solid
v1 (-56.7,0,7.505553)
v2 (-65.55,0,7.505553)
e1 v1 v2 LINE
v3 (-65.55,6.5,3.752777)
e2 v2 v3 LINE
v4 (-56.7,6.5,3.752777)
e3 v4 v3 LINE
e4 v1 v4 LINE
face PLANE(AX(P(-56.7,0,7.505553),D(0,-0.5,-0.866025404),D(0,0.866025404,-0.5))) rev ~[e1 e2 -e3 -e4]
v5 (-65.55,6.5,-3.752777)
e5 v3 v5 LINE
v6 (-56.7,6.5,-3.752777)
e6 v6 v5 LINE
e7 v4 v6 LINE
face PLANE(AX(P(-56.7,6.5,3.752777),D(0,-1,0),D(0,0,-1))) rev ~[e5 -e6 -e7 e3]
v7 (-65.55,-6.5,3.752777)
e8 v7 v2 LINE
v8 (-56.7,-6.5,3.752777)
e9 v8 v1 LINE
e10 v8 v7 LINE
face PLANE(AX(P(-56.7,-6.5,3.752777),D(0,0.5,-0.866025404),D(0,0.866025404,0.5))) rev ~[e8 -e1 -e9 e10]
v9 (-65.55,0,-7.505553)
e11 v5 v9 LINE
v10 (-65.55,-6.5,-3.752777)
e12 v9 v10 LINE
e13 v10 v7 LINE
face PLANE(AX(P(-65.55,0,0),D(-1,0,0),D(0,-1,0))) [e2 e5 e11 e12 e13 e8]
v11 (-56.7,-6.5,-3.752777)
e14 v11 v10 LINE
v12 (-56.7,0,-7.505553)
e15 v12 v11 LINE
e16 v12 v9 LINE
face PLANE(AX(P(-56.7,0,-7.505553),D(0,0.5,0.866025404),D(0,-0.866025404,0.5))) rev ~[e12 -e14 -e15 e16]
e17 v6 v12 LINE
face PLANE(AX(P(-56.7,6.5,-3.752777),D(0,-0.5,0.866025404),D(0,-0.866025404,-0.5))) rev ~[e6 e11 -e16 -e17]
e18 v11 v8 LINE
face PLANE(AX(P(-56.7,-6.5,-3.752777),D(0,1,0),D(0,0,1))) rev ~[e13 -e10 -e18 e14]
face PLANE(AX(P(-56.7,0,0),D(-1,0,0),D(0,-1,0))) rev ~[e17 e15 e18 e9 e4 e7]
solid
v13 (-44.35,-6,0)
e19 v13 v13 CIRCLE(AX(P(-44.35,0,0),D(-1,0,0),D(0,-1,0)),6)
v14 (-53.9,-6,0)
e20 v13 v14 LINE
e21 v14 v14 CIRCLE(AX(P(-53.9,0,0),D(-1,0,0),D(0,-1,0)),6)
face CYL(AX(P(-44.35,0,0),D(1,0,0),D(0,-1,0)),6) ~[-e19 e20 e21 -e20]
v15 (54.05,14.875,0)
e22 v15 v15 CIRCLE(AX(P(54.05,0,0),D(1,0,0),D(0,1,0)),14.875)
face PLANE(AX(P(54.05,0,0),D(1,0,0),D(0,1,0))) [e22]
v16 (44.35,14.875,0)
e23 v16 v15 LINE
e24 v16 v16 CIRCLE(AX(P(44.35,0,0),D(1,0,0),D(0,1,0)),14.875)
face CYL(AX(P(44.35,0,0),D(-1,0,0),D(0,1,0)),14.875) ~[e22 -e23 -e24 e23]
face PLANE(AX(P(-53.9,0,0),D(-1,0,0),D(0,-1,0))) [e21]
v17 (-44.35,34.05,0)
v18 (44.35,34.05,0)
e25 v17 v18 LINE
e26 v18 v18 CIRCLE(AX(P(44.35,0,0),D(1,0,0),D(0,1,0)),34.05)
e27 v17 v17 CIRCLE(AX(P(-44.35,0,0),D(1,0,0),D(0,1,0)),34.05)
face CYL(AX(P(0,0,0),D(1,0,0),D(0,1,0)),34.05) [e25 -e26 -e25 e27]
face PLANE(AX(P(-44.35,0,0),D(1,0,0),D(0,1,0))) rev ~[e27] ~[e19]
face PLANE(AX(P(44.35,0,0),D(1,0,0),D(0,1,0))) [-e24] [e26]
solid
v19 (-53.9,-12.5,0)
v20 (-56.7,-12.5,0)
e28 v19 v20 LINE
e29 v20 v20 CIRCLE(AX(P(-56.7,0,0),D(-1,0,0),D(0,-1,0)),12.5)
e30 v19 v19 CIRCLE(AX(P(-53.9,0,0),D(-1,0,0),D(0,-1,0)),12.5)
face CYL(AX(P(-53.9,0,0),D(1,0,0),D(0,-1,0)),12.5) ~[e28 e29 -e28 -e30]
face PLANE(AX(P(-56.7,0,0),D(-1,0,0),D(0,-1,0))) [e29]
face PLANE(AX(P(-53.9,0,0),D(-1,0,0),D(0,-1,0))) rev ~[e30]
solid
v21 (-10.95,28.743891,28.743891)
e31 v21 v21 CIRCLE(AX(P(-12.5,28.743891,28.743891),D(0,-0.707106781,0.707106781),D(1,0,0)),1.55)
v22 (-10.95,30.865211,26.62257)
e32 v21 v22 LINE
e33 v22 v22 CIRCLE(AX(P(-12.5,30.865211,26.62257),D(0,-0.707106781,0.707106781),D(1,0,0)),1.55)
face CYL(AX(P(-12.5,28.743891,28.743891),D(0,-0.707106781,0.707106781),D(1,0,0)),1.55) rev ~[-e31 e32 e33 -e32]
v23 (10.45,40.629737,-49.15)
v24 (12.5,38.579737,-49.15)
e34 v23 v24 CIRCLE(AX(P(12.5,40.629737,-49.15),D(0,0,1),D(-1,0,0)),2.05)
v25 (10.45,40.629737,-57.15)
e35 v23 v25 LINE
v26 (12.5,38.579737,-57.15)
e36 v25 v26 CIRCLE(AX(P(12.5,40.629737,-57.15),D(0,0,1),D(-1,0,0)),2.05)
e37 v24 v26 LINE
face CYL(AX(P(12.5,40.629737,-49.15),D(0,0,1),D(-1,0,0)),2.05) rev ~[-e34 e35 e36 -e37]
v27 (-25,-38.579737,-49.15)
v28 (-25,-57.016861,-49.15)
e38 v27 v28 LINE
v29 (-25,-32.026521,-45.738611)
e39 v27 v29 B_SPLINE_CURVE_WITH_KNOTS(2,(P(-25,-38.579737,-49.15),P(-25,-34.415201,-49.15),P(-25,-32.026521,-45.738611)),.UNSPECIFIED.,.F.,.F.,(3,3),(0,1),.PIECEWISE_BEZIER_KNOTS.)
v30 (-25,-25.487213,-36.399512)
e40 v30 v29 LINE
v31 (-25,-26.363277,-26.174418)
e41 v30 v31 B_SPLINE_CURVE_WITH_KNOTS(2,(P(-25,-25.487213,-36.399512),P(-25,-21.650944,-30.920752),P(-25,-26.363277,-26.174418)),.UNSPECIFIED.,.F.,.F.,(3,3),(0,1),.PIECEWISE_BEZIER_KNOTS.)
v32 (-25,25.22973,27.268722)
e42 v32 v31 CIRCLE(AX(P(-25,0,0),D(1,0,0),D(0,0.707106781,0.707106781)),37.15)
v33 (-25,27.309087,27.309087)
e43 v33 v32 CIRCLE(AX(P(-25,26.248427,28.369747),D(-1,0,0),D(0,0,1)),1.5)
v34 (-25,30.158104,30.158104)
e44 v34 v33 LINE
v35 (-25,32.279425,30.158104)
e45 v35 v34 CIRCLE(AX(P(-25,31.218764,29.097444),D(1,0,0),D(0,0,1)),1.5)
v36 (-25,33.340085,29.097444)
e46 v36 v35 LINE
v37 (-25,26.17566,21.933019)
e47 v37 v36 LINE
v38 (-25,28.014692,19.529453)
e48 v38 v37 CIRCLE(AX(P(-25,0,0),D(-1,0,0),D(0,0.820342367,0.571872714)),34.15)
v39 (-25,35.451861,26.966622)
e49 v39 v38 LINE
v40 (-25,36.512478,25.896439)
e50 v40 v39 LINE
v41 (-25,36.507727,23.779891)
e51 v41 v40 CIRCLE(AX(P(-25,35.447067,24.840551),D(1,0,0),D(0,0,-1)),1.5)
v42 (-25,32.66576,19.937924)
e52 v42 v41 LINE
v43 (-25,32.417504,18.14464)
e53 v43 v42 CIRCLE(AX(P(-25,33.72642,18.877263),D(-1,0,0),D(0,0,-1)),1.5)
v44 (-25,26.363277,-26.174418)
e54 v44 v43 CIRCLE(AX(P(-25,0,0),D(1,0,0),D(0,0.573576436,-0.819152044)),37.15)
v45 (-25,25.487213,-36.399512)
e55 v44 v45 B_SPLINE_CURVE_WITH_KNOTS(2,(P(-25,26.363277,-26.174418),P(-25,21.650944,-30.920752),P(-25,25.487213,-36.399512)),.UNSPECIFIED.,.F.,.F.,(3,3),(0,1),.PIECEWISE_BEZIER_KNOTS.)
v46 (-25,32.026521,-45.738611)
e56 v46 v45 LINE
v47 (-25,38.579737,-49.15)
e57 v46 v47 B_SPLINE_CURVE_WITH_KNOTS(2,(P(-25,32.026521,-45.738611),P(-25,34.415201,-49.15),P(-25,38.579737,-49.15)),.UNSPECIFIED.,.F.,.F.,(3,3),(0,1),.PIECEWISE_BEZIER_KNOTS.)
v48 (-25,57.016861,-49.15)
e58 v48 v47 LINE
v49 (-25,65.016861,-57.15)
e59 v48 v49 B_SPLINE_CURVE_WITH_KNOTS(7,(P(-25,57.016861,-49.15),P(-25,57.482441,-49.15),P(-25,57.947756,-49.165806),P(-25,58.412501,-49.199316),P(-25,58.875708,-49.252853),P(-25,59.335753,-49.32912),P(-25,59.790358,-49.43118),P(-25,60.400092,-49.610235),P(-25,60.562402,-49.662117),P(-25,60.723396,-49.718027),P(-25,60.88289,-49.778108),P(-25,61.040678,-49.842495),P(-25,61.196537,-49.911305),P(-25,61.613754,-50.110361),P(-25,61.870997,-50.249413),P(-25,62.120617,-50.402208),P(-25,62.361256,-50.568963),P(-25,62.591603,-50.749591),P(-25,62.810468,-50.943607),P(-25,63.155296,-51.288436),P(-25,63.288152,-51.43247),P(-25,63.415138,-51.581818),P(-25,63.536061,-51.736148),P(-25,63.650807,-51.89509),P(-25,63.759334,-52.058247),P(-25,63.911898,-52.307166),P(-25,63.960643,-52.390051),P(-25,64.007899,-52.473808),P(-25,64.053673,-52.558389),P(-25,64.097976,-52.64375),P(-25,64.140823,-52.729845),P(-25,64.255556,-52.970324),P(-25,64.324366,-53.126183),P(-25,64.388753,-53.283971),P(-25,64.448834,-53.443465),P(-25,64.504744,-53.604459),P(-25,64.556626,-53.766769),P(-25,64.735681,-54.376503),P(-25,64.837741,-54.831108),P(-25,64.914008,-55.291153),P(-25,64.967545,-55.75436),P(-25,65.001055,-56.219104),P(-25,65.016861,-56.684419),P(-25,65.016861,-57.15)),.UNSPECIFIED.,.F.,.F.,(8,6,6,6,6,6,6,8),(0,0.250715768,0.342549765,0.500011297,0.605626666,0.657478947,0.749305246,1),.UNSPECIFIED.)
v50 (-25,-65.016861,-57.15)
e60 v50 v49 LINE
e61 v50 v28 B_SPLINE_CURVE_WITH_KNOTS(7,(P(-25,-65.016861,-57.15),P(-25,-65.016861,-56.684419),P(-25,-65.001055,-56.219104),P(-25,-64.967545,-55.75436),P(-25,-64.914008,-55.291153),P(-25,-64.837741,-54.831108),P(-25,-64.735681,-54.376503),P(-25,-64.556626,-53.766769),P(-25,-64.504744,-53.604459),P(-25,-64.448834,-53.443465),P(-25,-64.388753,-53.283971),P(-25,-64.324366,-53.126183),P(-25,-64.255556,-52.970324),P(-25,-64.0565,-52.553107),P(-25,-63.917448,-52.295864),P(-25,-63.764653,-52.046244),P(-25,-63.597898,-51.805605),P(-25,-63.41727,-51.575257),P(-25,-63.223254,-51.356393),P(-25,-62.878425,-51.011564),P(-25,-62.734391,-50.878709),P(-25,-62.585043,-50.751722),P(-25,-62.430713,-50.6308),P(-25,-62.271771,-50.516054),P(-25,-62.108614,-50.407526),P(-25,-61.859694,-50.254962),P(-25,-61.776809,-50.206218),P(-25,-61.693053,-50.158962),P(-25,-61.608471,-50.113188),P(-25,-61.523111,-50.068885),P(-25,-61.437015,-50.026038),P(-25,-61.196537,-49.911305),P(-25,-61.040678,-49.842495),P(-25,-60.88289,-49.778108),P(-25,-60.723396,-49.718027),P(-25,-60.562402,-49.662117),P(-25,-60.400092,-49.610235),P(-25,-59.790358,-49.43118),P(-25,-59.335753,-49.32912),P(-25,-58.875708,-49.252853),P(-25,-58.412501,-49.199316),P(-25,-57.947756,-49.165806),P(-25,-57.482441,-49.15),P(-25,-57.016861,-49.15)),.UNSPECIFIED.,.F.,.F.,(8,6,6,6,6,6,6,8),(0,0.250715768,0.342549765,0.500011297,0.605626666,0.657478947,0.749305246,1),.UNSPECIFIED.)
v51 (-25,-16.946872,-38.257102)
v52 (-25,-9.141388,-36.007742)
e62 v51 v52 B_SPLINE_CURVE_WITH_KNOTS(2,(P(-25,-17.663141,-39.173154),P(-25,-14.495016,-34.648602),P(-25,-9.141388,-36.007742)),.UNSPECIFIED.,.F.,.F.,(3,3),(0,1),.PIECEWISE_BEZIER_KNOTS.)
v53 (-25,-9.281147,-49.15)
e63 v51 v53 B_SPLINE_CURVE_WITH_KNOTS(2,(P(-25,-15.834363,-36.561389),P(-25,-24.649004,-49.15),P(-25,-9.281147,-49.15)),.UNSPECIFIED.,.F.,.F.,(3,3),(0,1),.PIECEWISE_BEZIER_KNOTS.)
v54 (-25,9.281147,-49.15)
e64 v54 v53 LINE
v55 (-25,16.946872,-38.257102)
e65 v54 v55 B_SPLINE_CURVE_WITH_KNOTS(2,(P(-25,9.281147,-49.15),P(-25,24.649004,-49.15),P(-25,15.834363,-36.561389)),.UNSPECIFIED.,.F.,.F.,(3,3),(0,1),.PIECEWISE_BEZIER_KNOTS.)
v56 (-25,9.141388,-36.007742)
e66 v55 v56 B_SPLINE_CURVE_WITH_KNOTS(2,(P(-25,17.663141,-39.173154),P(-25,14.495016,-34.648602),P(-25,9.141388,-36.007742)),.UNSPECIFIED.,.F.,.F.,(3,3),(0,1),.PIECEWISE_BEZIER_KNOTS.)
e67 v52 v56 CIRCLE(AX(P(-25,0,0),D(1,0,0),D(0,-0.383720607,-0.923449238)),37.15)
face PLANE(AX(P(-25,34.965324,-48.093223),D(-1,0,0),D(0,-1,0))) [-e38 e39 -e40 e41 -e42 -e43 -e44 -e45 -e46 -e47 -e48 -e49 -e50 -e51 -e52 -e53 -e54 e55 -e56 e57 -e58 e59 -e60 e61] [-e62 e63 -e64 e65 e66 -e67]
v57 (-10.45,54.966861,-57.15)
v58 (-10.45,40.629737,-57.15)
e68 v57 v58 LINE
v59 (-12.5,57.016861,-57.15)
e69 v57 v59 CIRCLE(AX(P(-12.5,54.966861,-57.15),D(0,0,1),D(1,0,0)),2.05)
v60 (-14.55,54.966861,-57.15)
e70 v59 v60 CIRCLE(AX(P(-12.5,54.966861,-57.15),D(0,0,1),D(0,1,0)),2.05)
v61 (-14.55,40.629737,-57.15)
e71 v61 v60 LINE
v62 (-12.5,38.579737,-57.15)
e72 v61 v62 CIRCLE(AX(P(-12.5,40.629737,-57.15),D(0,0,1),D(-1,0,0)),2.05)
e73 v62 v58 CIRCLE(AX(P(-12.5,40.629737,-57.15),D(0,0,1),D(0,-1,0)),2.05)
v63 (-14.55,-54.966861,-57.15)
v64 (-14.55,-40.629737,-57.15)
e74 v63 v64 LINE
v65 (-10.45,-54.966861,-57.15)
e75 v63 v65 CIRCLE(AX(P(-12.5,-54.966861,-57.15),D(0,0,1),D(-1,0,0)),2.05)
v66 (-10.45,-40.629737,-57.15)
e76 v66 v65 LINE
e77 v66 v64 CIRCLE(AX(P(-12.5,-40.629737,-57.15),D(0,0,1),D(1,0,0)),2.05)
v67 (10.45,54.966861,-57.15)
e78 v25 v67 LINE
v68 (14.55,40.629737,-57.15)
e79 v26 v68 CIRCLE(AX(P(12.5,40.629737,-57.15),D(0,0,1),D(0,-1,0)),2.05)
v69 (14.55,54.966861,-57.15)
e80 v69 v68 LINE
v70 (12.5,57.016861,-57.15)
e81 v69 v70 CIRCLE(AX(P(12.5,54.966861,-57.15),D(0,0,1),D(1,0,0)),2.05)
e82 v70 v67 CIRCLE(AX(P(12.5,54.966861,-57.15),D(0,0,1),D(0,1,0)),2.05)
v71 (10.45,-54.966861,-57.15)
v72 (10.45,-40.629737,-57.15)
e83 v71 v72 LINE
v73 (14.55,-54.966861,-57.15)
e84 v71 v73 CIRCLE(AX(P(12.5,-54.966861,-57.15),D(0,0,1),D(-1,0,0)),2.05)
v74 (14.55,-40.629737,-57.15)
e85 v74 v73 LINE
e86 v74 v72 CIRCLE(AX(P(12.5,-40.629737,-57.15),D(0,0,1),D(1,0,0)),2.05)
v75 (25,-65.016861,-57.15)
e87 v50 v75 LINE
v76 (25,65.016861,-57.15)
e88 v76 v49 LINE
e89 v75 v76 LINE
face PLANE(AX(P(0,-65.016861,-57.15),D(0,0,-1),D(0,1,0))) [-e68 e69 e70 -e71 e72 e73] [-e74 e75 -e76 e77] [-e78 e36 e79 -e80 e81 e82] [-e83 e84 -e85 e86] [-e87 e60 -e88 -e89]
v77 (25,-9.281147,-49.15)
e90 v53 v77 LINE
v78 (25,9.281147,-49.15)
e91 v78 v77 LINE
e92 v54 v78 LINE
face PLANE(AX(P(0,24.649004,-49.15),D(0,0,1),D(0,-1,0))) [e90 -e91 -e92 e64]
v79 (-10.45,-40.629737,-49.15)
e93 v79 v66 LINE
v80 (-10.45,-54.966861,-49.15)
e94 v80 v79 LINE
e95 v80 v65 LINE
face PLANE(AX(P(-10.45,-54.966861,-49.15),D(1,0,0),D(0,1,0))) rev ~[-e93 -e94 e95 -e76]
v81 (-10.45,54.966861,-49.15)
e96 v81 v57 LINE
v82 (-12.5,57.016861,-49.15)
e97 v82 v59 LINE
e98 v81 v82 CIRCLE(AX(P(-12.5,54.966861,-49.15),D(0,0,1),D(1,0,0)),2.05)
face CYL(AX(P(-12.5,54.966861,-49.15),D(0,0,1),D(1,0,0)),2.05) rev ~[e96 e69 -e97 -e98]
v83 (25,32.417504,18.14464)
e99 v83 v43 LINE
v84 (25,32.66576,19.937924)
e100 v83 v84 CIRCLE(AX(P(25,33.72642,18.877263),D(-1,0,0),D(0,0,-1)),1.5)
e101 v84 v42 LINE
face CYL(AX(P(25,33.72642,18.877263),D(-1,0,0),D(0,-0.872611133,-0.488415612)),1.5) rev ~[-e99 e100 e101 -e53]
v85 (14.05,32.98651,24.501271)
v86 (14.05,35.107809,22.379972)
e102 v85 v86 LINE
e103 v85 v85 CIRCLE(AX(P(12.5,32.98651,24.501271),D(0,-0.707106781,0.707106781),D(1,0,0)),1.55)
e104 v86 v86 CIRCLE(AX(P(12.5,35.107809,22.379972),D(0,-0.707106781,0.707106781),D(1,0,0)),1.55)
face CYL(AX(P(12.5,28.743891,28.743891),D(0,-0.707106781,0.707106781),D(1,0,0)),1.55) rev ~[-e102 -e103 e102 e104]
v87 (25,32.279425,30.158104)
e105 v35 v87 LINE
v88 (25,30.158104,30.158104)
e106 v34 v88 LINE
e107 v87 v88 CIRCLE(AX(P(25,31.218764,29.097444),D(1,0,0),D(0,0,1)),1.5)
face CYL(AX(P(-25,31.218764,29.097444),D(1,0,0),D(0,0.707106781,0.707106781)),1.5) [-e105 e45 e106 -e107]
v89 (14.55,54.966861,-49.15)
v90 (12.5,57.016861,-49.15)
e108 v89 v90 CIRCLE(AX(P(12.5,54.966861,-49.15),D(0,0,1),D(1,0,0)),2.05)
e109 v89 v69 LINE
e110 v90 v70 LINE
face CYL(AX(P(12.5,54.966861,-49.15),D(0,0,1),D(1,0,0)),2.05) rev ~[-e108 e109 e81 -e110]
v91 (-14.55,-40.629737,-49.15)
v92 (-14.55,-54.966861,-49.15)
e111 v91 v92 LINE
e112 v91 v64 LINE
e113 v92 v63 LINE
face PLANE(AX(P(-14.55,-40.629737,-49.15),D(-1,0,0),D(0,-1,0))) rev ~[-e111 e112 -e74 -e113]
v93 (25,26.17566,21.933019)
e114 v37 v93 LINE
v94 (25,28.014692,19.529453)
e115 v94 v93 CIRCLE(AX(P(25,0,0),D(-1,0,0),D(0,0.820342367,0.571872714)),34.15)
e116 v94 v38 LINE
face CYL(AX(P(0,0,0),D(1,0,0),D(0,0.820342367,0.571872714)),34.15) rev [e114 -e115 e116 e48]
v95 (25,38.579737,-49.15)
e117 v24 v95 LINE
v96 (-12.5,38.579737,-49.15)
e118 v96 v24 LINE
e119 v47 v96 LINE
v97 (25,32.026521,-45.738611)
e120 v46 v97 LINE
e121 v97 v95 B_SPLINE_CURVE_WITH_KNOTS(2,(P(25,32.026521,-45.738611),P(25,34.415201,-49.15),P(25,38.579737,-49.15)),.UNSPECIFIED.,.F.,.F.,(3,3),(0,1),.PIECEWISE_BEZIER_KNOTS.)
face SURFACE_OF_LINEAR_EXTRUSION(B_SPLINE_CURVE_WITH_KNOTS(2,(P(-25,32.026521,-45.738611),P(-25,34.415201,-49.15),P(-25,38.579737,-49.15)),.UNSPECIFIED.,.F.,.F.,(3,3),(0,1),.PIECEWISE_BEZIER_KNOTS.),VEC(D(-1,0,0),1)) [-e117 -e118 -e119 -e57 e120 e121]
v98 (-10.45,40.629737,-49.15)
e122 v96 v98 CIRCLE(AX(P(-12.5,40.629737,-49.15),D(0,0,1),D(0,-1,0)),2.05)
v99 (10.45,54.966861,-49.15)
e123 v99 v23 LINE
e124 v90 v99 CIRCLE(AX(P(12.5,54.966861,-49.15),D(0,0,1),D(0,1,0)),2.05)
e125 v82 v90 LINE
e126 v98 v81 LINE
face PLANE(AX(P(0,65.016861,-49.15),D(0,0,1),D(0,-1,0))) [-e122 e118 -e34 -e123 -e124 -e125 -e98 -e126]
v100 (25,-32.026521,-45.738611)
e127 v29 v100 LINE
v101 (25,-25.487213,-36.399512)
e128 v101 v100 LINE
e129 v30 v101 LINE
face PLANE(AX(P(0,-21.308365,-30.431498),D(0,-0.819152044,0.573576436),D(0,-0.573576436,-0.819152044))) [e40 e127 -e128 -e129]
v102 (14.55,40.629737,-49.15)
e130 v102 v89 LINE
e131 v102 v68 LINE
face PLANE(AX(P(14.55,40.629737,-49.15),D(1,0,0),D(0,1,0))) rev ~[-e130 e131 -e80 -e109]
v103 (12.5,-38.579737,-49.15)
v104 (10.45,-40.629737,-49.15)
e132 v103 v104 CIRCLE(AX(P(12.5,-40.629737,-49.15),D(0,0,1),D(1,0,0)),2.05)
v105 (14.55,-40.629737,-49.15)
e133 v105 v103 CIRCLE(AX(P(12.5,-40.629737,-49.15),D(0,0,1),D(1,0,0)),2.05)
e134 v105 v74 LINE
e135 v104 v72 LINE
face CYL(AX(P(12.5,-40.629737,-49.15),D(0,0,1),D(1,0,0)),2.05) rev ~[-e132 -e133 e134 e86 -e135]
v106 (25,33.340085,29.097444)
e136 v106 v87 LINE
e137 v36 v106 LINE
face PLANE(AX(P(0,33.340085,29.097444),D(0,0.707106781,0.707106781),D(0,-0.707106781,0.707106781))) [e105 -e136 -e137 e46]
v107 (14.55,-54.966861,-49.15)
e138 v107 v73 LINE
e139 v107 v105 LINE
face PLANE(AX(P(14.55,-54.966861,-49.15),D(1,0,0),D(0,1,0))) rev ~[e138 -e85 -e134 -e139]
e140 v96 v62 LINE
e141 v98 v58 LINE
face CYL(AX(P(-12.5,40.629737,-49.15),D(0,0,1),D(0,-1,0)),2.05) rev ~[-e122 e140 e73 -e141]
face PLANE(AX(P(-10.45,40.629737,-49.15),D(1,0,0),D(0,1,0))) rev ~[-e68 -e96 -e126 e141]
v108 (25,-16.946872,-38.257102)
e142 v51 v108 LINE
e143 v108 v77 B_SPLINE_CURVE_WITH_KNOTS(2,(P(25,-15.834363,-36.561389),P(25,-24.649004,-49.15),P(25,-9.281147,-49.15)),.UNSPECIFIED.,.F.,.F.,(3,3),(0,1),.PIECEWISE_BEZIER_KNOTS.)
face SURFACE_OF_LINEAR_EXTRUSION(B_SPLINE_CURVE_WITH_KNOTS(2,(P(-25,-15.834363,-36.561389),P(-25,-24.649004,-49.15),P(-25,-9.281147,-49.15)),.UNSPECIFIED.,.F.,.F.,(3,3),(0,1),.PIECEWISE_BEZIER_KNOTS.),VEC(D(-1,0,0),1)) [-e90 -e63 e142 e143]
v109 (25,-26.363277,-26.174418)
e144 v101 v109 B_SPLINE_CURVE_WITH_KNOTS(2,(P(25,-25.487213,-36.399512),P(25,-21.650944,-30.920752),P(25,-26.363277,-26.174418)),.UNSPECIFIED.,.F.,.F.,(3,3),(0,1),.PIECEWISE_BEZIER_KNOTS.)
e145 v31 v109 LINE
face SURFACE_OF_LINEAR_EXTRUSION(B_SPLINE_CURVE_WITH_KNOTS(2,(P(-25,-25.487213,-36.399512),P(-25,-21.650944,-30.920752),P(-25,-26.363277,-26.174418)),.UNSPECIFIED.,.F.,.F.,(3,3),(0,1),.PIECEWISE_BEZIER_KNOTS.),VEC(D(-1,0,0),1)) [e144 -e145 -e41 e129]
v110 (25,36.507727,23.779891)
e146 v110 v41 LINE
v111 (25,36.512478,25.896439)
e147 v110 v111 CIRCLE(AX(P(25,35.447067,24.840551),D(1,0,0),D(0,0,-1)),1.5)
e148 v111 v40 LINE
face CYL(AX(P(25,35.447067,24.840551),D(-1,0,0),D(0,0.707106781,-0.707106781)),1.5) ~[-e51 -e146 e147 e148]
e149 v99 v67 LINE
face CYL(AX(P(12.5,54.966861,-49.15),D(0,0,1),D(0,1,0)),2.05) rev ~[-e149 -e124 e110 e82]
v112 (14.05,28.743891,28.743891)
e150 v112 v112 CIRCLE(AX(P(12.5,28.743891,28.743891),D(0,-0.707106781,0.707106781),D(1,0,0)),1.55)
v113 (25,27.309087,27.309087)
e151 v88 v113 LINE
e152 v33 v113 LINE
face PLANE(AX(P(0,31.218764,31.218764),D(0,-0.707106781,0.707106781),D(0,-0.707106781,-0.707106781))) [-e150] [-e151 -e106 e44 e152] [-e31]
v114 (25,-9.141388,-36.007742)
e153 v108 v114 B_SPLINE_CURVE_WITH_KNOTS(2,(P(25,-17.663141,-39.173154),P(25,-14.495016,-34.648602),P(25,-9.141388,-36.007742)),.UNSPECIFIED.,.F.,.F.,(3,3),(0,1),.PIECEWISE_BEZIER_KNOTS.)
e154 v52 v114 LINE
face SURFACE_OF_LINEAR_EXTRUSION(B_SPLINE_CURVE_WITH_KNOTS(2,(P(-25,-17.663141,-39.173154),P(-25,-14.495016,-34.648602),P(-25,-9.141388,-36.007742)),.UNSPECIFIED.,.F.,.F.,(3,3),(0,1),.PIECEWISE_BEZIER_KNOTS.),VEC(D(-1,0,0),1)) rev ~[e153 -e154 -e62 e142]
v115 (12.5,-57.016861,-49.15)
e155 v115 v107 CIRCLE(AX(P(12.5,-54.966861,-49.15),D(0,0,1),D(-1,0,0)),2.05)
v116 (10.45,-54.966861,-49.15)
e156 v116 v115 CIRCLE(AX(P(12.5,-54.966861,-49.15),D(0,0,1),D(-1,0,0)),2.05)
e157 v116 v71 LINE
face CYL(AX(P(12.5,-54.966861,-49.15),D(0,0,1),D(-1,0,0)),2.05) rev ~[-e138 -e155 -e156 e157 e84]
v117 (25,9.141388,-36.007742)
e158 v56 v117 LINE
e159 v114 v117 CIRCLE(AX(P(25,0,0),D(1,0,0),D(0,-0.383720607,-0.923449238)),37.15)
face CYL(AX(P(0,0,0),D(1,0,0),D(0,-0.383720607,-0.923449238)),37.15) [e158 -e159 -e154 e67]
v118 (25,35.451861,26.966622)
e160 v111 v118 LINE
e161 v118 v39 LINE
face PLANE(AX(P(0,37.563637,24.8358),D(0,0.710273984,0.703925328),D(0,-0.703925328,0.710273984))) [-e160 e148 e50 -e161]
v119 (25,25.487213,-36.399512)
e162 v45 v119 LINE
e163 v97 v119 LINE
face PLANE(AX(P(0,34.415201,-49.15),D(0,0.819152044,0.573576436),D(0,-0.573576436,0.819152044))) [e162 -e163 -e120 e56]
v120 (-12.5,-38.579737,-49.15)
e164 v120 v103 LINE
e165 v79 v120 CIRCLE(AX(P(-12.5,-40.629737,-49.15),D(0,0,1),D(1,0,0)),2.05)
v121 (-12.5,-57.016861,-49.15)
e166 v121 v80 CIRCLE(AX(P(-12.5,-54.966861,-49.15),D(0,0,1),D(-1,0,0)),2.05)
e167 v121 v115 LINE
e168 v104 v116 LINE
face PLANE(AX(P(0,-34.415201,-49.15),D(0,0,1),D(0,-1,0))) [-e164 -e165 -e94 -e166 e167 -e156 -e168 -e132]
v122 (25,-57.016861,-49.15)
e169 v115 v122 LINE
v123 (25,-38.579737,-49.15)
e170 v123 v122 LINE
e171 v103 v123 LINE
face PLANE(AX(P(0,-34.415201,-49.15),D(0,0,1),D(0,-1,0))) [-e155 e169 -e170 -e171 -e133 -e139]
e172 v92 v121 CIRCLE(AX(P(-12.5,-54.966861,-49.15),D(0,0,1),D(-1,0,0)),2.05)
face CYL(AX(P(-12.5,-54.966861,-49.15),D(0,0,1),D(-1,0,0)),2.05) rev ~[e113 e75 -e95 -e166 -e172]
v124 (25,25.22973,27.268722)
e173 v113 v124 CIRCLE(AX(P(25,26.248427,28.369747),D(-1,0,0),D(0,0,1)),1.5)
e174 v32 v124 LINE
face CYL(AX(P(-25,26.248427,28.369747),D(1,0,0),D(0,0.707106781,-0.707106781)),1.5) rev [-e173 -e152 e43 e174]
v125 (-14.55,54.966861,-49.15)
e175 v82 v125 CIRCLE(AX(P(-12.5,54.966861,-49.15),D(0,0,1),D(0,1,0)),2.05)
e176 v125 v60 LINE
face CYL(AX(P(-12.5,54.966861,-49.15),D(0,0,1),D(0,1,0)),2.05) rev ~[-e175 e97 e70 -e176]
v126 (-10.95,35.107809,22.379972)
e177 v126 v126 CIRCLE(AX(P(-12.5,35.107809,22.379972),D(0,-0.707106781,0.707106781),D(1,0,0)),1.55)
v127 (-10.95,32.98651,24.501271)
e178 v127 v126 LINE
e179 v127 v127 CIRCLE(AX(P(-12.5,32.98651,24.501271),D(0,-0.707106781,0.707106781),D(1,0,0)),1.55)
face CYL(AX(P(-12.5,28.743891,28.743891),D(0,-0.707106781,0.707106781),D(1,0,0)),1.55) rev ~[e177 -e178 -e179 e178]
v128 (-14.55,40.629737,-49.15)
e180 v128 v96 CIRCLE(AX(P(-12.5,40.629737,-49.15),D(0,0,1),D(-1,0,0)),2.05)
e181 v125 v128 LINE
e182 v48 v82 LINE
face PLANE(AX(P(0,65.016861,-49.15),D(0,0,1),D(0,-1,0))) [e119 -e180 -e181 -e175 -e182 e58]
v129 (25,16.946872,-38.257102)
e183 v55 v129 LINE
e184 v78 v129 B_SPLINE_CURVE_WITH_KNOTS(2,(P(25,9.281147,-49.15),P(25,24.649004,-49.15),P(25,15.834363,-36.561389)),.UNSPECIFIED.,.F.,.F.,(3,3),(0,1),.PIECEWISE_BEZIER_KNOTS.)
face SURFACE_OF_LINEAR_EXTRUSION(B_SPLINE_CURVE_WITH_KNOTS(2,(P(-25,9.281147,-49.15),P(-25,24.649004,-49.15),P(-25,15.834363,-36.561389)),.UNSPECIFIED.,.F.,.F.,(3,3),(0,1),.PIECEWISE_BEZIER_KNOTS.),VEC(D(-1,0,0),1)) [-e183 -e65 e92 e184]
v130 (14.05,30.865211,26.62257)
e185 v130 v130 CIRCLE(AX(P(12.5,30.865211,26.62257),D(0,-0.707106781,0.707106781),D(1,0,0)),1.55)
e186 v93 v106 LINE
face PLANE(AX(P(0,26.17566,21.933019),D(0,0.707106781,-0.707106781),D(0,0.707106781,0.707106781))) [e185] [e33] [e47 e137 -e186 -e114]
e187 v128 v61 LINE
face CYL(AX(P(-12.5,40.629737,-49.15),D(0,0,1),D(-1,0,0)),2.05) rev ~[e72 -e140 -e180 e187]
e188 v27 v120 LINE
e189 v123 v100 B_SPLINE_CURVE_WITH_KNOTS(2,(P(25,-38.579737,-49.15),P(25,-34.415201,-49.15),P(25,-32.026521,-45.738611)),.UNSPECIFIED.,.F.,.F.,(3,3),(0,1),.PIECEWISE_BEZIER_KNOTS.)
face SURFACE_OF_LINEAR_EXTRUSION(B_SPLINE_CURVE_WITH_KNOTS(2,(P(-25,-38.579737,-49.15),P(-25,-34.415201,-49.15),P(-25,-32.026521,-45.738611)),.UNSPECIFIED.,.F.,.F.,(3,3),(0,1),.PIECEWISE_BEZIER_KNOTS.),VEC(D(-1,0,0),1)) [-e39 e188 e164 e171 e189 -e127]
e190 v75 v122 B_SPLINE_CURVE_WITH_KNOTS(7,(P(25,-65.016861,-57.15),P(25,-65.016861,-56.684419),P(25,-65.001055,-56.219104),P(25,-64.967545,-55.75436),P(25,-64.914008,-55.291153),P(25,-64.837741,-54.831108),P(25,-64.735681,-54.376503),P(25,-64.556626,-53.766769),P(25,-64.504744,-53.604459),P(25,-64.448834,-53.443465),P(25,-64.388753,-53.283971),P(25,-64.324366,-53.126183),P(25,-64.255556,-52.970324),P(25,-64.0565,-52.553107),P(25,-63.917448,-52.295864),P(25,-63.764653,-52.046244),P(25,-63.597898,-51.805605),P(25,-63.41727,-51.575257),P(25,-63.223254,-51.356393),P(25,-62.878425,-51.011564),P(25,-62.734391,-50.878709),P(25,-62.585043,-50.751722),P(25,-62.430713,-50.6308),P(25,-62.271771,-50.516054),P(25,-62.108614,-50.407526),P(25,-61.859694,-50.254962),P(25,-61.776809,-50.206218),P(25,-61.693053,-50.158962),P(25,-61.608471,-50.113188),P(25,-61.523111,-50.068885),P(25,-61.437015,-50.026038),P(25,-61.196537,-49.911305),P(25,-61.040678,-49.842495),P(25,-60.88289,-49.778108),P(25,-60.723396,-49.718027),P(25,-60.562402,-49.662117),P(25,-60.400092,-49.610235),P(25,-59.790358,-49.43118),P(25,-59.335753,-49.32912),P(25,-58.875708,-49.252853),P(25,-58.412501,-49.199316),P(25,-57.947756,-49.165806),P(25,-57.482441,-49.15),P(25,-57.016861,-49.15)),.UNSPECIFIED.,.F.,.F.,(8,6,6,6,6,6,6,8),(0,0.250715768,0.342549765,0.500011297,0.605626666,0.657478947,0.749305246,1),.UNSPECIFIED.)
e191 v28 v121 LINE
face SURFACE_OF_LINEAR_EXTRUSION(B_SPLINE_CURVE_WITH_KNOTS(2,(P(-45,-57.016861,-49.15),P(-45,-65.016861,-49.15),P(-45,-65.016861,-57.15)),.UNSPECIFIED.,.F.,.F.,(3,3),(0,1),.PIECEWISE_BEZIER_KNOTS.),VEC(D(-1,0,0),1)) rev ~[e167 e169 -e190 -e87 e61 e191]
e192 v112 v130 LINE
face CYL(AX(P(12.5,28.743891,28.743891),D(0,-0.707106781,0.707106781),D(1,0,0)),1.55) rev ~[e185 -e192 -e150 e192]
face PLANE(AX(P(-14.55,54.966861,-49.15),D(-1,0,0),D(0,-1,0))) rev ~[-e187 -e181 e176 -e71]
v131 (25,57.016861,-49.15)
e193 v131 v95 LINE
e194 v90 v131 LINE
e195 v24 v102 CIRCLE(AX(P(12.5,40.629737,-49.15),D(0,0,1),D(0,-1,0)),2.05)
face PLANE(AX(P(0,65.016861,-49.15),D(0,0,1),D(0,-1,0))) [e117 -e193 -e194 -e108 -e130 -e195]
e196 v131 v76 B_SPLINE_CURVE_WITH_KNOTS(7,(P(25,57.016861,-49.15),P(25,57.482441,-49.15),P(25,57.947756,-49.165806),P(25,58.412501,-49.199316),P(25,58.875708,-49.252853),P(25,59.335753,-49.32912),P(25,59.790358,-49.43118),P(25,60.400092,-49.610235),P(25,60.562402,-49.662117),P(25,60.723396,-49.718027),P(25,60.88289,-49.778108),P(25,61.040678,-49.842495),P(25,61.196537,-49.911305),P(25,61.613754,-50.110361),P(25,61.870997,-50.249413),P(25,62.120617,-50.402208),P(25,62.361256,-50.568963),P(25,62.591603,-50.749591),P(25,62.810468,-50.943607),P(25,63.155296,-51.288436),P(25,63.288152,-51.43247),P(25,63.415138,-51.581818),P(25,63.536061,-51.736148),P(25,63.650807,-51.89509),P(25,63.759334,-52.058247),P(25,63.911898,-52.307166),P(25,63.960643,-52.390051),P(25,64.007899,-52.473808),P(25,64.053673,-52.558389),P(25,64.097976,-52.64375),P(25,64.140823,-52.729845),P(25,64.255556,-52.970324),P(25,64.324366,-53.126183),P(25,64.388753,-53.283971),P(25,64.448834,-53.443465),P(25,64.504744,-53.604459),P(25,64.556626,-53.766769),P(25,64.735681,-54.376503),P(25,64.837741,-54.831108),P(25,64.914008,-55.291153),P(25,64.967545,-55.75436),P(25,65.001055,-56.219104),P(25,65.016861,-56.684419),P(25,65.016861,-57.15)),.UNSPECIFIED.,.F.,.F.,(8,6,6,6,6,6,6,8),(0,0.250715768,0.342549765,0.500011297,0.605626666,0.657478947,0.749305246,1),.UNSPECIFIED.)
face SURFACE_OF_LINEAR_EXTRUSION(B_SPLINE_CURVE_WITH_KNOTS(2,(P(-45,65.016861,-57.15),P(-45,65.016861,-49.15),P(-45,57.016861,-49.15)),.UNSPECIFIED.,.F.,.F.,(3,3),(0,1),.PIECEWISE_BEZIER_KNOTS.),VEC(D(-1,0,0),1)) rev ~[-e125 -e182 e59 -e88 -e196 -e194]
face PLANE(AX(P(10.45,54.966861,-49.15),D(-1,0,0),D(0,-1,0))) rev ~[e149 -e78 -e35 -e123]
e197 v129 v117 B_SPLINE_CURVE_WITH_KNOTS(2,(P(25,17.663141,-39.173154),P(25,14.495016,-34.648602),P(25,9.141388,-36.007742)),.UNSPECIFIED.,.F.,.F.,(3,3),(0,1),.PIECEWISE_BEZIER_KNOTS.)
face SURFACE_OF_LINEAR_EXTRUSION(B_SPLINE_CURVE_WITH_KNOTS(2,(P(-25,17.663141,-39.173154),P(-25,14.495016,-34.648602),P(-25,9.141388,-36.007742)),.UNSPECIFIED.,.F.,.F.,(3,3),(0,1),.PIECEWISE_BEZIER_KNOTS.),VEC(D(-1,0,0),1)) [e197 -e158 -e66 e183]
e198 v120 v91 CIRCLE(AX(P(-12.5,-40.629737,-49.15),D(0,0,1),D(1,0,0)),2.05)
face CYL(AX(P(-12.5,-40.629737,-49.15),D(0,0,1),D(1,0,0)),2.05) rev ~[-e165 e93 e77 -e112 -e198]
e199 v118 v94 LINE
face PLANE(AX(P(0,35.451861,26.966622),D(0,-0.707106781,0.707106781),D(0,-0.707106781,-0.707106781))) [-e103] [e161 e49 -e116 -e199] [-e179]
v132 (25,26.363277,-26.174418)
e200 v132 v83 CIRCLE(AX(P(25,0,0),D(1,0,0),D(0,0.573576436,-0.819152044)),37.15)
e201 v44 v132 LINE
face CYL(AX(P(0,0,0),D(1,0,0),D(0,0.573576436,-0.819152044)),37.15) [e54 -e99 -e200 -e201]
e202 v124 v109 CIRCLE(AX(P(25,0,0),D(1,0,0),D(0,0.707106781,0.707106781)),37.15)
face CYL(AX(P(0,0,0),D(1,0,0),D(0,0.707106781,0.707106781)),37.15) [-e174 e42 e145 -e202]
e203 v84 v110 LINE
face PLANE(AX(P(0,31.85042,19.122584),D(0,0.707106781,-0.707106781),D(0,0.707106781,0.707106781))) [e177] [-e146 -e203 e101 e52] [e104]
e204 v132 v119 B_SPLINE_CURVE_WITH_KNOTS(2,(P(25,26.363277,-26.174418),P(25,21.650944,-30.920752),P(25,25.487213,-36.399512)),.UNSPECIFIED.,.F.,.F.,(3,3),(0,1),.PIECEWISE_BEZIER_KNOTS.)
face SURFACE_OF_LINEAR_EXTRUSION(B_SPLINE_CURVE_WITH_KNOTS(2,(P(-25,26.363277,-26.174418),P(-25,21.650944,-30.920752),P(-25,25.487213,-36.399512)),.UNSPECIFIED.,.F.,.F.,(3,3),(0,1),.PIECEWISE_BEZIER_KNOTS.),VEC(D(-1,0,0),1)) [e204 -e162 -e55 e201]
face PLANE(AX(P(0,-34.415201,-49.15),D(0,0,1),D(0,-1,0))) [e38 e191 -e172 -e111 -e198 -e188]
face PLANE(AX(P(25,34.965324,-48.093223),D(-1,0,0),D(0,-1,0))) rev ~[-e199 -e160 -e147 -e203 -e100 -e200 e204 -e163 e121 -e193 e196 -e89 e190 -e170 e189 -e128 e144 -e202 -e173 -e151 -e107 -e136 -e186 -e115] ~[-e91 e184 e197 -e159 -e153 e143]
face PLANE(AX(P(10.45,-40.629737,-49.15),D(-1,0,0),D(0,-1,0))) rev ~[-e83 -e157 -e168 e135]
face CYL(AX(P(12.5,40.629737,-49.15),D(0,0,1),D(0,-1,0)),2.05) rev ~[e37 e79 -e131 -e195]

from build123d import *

# Parameters (mm, degrees)
F0_R         = 34.05
F1_DEPTH     = 44.35
F2_R         = 14.875
F3_DEPTH     = 9.7
F4_R         = 6
F5_DEPTH     = 9.55
F6_R         = 12.5
F7_DEPTH     = 2.8
F9_DEPTH     = 8.85
F10_DEPTH    = 25
F11_T1_DEPTH = 50
F11_T3_DEPTH = 90
F13_DEPTH    = 8.0010001
F14_R        = 1.55
F15_DEPTH    = 86.3860158555
F16_R        = 1.5


# Not quite as in the source:
# - a fillet or chamfer that OpenCascade refuses, or shapes differently, is made with other operations: its cross-section is extruded or revolved along the edge and cut away or added


with BuildPart() as f1:
    # F0 (on Right) → F1 (new body, symmetric)
    with BuildSketch(Plane.YZ):
        Circle(F0_R)
    extrude(amount=F1_DEPTH, both=True)

    # F2 (on face) → F3 (join)
    with BuildSketch(Plane.YZ.offset(44.35)):
        Circle(F2_R)
    extrude(amount=F3_DEPTH)

    # F4 (on face) → F5 (join)
    with BuildSketch(Plane(origin=(-44.35, 0, 0), x_dir=(0, -1, 0), z_dir=(-1, 0, 0))):
        Circle(F4_R)
    extrude(amount=F5_DEPTH)


with BuildPart() as f7:
    # F6 (on face) → F7 (new body)
    with BuildSketch(Plane(origin=(-53.9, 0, 0), x_dir=(0, -1, 0), z_dir=(-1, 0, 0))):
        Circle(F6_R)
    extrude(amount=F7_DEPTH)


with BuildPart() as f9:
    # F8 (on face) → F9 (new body)
    with BuildSketch(Plane(origin=(-56.7, 0, 0), x_dir=(0, -1, 0), z_dir=(-1, 0, 0))):
        Polygon((6.5, 3.7527767497), (0, 7.5055534995), (-6.5, 3.7527767497), (-6.5, -3.7527767497), (0, -7.5055534995), (6.5, -3.7527767497), align=None)
    extrude(amount=F9_DEPTH)


with BuildPart() as f10:
    # F0 (on Right) → F10 (new body, symmetric)
    with BuildSketch(Plane.YZ):
        with BuildLine():
            ThreePointArc((28.0146918209, 19.5294531972), (-27.1218147701, -20.7516183363), (26.1756598689, 21.9330191818))
            Line((26.1756598689, 21.9330191818), (33.3400847329, 29.0974440458))
            Line((33.3400847329, 29.0974440458), (31.2187643894, 31.2187643894))
            Line((31.2187643894, 31.2187643894), (26.2690169211, 26.2690169211))
            ThreePointArc((26.2690169211, 26.2690169211), (-28.4585510619, 23.8795596999), (-21.3083646104, -30.4314984453))
            Line((-21.3083646104, -30.4314984453), (-34.415200503, -49.15))
            Line((-34.415200503, -49.15), (-65.0168608087, -49.15))
            Line((-65.0168608087, -49.15), (-65.0168608087, -57.15))
            Line((-65.0168608087, -57.15), (-40.0168608087, -57.15))
            Line((-40.0168608087, -57.15), (40.0168608087, -57.15))
            Line((40.0168608087, -57.15), (65.0168608087, -57.15))
            Line((65.0168608087, -57.15), (65.0168608087, -49.15))
            Line((65.0168608087, -49.15), (34.415200503, -49.15))
            Line((34.415200503, -49.15), (21.3083646104, -30.4314984453))
            ThreePointArc((21.3083646104, -30.4314984453), (36.3368391247, -7.7302407742), (31.8504204749, 19.1225839147))
            Line((31.8504204749, 19.1225839147), (37.5636367015, 24.8358001413))
            Line((37.5636367015, 24.8358001413), (35.4518607172, 26.9666220935))
            Line((35.4518607172, 26.9666220935), (28.0146918209, 19.5294531972))
        make_face()
        with BuildLine():
            Line((14.2552205634, -34.3061391982), (24.6490037929, -49.15))
            Line((24.6490037929, -49.15), (-24.6490037929, -49.15))
            Line((-24.6490037929, -49.15), (-14.2552205634, -34.3061391982))
            ThreePointArc((-14.2552205634, -34.3061391982), (0, -37.15), (14.2552205634, -34.3061391982))
        make_face(mode=Mode.SUBTRACT)
    extrude(amount=F10_DEPTH, both=True)

    # F11: fillet of radius 8 on 10 edges, made by hand

    # F11_s2 → F11_t1 (join)
    with BuildSketch(Plane.YZ.offset(-25)):
        with BuildLine():
            add(Edge.make_bspline(
                [(32.0265205531, -45.7386114908), (34.415200503, -49.15), (38.5797369074, -49.15)],
                knots=[0, 0, 0, 1, 1, 1], degree=2, weights=[1, 1, 1]))
            Line((38.5797369074, -49.15), (34.415200503, -49.15))
            Line((34.415200503, -49.15), (32.0265205531, -45.7386114908))
        make_face()
        with BuildLine():
            add(Edge.make_bspline(
                [(-38.5797369074, -49.15), (-34.415200503, -49.15), (-32.0265205531, -45.7386114908)],
                knots=[0, 0, 0, 1, 1, 1], degree=2, weights=[1, 1, 1]))
            Line((-32.0265205531, -45.7386114908), (-34.415200503, -49.15))
            Line((-34.415200503, -49.15), (-38.5797369074, -49.15))
        make_face()
        with BuildLine():
            add(Edge.make_bspline(
                [(-25.4872127895, -36.3995121427), (-21.650943696, -30.9207520836), (-26.363276693, -26.1744177014)],
                knots=[0, 0, 0, 1, 1, 1], degree=2, weights=[1, 1, 1]))
            ThreePointArc((-26.363276693, -26.1744177014), (-23.930671329, -28.4155849798), (-21.3083646104, -30.4314984453))
            Line((-21.3083646104, -30.4314984453), (-25.4872127895, -36.3995121427))
        make_face()
        with BuildLine():
            add(Edge.make_bspline(
                [(-15.8343631315, -36.5613885092), (-24.6490037929, -49.15), (-9.2811467771, -49.15)],
                knots=[0, 0, 0, 1, 1, 1], degree=2, weights=[1, 1, 1]))
            Line((-9.2811467771, -49.15), (-24.6490037929, -49.15))
            Line((-24.6490037929, -49.15), (-15.8343631315, -36.5613885092))
        make_face()
        with BuildLine():
            add(Edge.make_bspline(
                [(9.2811467771, -49.15), (24.6490037929, -49.15), (15.8343631315, -36.5613885092)],
                knots=[0, 0, 0, 1, 1, 1], degree=2, weights=[1, 1, 1]))
            Line((15.8343631315, -36.5613885092), (24.6490037929, -49.15))
            Line((24.6490037929, -49.15), (9.2811467771, -49.15))
        make_face()
        with BuildLine():
            add(Edge.make_bspline(
                [(17.6631407114, -39.1731535648), (14.4950155025, -34.6486018625), (9.1413884799, -36.0077424544)],
                knots=[0, 0, 0, 1, 1, 1], degree=2, weights=[1, 1, 1]))
            ThreePointArc((9.1413884799, -36.0077424544), (11.7292025343, -35.2497986932), (14.2552205634, -34.3061391982))
            Line((14.2552205634, -34.3061391982), (17.6631407114, -39.1731535648))
        make_face()
        with BuildLine():
            add(Edge.make_bspline(
                [(26.363276693, -26.1744177014), (21.650943696, -30.9207520836), (25.4872127895, -36.3995121427)],
                knots=[0, 0, 0, 1, 1, 1], degree=2, weights=[1, 1, 1]))
            Line((25.4872127895, -36.3995121427), (21.3083646104, -30.4314984453))
            ThreePointArc((21.3083646104, -30.4314984453), (23.930671329, -28.4155849798), (26.363276693, -26.1744177014))
        make_face()
        with BuildLine():
            add(Edge.make_bspline(
                [(-17.6631407114, -39.1731535648), (-14.4950155025, -34.6486018625), (-9.1413884799, -36.0077424544)],
                knots=[0, 0, 0, 1, 1, 1], degree=2, weights=[1, 1, 1]))
            ThreePointArc((-9.1413884799, -36.0077424544), (-11.7292025343, -35.2497986932), (-14.2552205634, -34.3061391982))
            Line((-14.2552205634, -34.3061391982), (-17.6631407114, -39.1731535648))
        make_face()
    extrude(amount=F11_T1_DEPTH)

    # F11_s4 → F11_t3 (cut)
    with BuildSketch(Plane.YZ.offset(-45)):
        with BuildLine():
            add(Edge.make_bspline(
                [(-57.0168608087, -49.15), (-65.0168608087, -49.15), (-65.0168608087, -57.15)],
                knots=[0, 0, 0, 1, 1, 1], degree=2, weights=[1, 1, 1]))
            Line((-65.0168608087, -57.15), (-65.0168608087, -49.15))
            Line((-65.0168608087, -49.15), (-57.0168608087, -49.15))
        make_face()
        with BuildLine():
            add(Edge.make_bspline(
                [(65.0168608087, -57.15), (65.0168608087, -49.15), (57.0168608087, -49.15)],
                knots=[0, 0, 0, 1, 1, 1], degree=2, weights=[1, 1, 1]))
            Line((57.0168608087, -49.15), (65.0168608087, -49.15))
            Line((65.0168608087, -49.15), (65.0168608087, -57.15))
        make_face()
    extrude(amount=F11_T3_DEPTH, mode=Mode.SUBTRACT)

    # F12 (on face) → F13 (cut, through all)
    with BuildSketch(Plane.XY.offset(-49.15)):
        with BuildLine():
            ThreePointArc((-10.45, 54.9668608087), (-11.0504310986, 56.4164297101), (-12.5, 57.0168608087))
            ThreePointArc((-12.5, 57.0168608087), (-13.9495689014, 56.4164297101), (-14.55, 54.9668608087))
            Line((-14.55, 54.9668608087), (-14.55, 40.6297369074))
            ThreePointArc((-14.55, 40.6297369074), (-13.9495689014, 39.180168006), (-12.5, 38.5797369074))
            ThreePointArc((-12.5, 38.5797369074), (-11.0504310986, 39.180168006), (-10.45, 40.6297369074))
            Line((-10.45, 40.6297369074), (-10.45, 54.9668608087))
        make_face()
        with BuildLine():
            ThreePointArc((14.55, 54.9668608087), (13.9495689014, 56.4164297101), (12.5, 57.0168608087))
            ThreePointArc((12.5, 57.0168608087), (11.0504310986, 56.4164297101), (10.45, 54.9668608087))
            Line((10.45, 54.9668608087), (10.45, 40.6297369074))
            ThreePointArc((10.45, 40.6297369074), (11.0504310986, 39.180168006), (12.5, 38.5797369074))
            ThreePointArc((12.5, 38.5797369074), (13.9495689014, 39.180168006), (14.55, 40.6297369074))
            Line((14.55, 40.6297369074), (14.55, 54.9668608087))
        make_face()
        with BuildLine():
            Line((14.55, -54.9668608087), (14.55, -40.6297369074))
            ThreePointArc((14.55, -40.6297369074), (12.5, -38.5797369074), (10.45, -40.6297369074))
            Line((10.45, -40.6297369074), (10.45, -54.9668608087))
            ThreePointArc((10.45, -54.9668608087), (12.5, -57.0168608087), (14.55, -54.9668608087))
        make_face()
        with BuildLine():
            Line((-10.45, -54.9668608087), (-10.45, -40.6297369074))
            ThreePointArc((-10.45, -40.6297369074), (-12.5, -38.5797369074), (-14.55, -40.6297369074))
            Line((-14.55, -40.6297369074), (-14.55, -54.9668608087))
            ThreePointArc((-14.55, -54.9668608087), (-12.5, -57.0168608087), (-10.45, -54.9668608087))
        make_face()
    extrude(amount=-F13_DEPTH, mode=Mode.SUBTRACT)

    # F14 (on face) → F15 (cut, through all)
    with BuildSketch(Plane(origin=(0, 0, 0), x_dir=(1, 0, 0), z_dir=(0, -0.7071067812, 0.7071067812))):
        with Locations((-12.5, 40.65)):
            Circle(F14_R)
        with Locations((12.5, 40.65)):
            Circle(F14_R)
    extrude(amount=-F15_DEPTH, mode=Mode.SUBTRACT)

    # F16
    f16_edges = [f10.edges().sort_by_distance(p)[0] for p in [
        (0, 31.218764, 31.218764),
        (0, 37.563637, 24.8358),
        (0, 31.85042, 19.122584),
        (0, 26.269017, 26.269017),
    ]]
    fillet(f16_edges, radius=F16_R)


solid = Compound([f1.part, f7.part, f9.part, f10.part])
